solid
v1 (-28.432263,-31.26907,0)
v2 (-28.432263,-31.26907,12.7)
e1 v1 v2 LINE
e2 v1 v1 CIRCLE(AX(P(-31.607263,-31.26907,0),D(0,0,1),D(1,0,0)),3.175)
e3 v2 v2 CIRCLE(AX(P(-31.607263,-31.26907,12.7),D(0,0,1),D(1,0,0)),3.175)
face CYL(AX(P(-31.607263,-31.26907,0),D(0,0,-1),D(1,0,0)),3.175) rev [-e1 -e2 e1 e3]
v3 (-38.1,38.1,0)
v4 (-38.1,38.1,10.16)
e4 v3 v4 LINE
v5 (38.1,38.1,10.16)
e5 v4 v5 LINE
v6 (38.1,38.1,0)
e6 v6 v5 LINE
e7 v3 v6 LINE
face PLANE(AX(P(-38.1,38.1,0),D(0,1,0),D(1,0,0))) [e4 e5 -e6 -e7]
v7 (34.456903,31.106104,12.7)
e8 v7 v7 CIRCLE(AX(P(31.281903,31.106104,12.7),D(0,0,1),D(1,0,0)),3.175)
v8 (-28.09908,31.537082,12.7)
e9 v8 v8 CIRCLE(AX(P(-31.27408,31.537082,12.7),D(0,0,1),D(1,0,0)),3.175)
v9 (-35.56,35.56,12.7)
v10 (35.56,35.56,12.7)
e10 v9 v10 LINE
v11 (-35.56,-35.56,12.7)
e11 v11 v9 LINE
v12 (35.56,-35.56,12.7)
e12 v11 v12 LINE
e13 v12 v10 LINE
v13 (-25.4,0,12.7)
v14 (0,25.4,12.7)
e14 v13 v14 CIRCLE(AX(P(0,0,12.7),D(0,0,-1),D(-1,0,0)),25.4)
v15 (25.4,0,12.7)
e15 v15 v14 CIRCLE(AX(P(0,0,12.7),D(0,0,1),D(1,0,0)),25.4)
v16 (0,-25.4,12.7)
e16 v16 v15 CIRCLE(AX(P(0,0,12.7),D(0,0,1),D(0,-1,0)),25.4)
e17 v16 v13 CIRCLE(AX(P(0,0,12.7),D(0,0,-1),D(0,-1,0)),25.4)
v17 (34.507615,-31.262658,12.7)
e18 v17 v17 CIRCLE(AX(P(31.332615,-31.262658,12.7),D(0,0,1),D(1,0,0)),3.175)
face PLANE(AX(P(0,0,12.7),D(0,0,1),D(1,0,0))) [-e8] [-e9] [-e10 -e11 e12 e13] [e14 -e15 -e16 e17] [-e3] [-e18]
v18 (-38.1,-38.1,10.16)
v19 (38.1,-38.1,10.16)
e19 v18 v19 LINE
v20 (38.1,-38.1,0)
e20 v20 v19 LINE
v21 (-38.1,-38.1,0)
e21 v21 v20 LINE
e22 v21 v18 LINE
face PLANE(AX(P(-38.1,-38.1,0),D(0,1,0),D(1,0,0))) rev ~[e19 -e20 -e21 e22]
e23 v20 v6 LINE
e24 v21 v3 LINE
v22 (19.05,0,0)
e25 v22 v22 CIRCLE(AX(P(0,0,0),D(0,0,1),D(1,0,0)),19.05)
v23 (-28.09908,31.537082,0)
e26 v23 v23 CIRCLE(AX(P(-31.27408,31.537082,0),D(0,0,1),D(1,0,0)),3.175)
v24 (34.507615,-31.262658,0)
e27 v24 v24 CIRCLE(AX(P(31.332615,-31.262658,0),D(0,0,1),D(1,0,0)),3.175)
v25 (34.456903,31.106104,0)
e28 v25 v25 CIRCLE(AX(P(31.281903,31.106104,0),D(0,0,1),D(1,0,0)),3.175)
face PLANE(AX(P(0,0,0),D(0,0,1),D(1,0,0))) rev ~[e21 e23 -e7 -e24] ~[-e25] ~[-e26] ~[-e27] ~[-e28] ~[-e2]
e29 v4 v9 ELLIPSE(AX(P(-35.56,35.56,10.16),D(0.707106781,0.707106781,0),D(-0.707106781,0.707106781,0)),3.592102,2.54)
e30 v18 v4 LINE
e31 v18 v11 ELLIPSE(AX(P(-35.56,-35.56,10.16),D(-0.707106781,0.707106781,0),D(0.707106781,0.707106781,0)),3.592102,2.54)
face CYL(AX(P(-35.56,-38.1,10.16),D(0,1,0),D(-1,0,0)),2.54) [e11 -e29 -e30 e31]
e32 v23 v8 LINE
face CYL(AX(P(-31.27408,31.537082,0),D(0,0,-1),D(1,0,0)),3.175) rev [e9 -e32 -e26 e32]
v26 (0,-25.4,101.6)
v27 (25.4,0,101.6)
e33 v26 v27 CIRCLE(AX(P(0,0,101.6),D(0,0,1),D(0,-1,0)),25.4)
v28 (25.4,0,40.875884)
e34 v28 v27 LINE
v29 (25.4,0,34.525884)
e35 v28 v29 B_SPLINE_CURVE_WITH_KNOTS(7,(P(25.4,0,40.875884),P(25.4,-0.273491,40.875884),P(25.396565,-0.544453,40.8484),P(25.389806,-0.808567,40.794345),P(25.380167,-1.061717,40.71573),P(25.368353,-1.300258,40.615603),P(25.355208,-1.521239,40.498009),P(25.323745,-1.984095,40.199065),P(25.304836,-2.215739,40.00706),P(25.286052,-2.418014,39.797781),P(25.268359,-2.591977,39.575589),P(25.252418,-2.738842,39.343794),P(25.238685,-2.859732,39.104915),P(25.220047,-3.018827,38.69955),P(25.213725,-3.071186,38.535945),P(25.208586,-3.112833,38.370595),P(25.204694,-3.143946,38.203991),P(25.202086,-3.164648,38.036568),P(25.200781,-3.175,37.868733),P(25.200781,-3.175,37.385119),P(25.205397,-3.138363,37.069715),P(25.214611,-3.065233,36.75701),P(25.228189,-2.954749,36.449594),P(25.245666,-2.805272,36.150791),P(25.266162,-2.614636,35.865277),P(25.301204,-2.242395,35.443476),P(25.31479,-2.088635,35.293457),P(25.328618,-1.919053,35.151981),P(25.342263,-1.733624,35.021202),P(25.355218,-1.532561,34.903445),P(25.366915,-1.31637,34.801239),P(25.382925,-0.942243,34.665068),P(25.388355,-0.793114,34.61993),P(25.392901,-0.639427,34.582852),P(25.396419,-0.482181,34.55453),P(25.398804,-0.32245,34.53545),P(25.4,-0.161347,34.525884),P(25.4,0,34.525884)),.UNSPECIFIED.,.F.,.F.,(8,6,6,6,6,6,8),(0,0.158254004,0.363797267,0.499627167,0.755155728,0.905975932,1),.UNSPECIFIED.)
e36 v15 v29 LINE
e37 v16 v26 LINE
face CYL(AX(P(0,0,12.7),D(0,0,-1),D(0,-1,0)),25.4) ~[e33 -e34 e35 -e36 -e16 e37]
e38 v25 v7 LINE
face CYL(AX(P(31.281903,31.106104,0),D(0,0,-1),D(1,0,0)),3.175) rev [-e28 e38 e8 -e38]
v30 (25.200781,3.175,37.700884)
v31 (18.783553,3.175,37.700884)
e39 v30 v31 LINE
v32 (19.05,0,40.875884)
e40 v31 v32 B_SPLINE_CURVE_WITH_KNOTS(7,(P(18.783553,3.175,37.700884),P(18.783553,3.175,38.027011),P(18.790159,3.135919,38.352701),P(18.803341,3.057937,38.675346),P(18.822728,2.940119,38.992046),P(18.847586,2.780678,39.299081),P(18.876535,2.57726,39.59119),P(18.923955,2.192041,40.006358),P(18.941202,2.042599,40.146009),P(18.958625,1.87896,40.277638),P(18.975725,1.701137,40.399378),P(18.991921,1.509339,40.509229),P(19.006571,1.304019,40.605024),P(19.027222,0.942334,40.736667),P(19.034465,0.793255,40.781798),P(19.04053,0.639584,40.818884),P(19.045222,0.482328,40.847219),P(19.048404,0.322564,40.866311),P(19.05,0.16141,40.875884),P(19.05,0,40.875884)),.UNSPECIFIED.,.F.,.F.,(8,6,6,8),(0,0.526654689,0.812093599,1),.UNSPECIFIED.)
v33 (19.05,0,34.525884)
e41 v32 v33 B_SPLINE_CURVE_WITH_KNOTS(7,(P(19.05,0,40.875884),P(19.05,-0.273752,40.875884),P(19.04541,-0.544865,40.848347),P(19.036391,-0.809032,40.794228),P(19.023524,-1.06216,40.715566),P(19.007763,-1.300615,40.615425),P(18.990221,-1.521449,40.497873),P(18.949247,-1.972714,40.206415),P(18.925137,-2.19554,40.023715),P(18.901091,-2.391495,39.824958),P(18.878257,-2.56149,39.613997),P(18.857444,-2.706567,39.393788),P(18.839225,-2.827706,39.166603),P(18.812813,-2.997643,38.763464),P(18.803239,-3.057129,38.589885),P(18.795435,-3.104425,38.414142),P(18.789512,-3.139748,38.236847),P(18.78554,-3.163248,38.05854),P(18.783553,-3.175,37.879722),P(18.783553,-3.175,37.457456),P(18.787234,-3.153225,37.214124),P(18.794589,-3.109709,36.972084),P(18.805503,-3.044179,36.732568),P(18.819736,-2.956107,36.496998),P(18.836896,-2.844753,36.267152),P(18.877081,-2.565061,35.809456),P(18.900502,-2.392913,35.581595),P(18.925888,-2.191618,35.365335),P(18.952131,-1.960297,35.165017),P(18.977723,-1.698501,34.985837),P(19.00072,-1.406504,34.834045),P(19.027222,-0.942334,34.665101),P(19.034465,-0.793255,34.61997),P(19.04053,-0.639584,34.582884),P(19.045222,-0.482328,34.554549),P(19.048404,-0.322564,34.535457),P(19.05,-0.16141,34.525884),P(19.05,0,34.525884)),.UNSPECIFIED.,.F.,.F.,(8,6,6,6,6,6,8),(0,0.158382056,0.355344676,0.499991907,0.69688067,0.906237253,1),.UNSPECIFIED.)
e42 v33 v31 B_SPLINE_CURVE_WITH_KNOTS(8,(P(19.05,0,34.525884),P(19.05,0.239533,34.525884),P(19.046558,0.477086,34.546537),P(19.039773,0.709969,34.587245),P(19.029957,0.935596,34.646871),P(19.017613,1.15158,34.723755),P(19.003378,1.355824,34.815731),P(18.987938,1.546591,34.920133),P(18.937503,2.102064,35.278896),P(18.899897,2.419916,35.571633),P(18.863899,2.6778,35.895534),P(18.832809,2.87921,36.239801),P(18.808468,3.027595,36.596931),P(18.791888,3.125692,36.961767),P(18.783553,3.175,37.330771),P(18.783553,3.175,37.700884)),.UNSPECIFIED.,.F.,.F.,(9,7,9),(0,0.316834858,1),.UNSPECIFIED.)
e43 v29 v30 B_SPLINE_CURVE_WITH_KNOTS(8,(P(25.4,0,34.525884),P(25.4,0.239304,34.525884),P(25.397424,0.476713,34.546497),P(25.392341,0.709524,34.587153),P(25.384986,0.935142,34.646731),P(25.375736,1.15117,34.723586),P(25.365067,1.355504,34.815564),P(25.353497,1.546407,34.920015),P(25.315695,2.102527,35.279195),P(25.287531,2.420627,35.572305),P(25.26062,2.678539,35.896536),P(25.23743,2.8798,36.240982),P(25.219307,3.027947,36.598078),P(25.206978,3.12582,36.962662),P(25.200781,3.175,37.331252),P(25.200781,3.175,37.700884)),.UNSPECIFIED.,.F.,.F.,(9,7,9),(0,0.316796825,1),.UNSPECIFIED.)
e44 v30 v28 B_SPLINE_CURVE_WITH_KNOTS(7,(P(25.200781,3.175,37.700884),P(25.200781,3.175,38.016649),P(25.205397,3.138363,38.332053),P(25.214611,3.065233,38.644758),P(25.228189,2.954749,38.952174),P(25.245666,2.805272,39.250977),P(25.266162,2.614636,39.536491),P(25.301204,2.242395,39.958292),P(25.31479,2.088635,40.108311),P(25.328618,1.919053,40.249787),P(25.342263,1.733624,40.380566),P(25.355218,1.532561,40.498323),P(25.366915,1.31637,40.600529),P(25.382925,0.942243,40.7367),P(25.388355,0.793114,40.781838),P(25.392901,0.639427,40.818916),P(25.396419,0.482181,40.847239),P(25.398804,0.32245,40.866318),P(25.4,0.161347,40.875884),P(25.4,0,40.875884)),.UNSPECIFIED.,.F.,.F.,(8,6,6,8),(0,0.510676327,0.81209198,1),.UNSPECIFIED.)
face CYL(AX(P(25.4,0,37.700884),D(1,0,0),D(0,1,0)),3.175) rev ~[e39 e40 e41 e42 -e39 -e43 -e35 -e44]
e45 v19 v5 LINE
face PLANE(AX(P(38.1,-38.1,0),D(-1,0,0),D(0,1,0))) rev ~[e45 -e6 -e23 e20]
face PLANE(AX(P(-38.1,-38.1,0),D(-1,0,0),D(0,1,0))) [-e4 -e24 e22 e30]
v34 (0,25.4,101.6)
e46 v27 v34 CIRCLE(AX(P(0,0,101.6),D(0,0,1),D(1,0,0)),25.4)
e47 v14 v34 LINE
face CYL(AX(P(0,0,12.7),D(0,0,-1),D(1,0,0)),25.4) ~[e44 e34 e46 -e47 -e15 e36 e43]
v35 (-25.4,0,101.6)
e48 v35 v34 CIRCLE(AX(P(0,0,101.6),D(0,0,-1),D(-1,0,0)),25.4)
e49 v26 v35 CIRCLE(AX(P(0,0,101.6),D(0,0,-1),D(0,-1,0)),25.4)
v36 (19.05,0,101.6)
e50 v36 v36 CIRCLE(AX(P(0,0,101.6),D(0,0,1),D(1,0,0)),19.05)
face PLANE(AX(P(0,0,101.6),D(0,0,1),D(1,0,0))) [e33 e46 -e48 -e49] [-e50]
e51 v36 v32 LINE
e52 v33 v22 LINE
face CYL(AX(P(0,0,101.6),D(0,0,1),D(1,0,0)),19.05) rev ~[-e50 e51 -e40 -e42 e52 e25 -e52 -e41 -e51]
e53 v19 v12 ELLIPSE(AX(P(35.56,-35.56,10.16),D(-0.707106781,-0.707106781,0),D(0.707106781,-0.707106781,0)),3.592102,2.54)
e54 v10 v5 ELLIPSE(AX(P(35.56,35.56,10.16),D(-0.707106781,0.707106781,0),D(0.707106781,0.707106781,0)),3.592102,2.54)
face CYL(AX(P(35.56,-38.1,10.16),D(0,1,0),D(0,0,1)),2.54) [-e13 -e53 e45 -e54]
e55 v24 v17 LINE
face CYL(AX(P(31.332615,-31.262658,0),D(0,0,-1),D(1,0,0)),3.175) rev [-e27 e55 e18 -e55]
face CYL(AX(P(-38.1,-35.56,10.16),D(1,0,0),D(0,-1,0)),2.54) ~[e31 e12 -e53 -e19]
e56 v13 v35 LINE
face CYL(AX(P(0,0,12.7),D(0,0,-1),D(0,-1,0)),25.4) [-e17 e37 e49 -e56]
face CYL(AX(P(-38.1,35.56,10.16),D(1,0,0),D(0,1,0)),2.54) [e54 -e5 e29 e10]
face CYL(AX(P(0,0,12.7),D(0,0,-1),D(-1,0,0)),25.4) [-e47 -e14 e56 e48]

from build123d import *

# Parameters (mm, degrees)
F0_W        = 50.8
F0_H        = 50.8
F1_DEPTH    = 101.6
F0_W_2      = 76.2
F0_H_2      = 76.2
F0_R        = 3.175
F2_DEPTH    = 12.7
F3_R        = 19.05
F4_DEPTH    = 101.601
F5_R        = 3.175
F6_DEPTH    = 25.4
F7_T1_DEPTH = 88.9
F8_R        = 2.54


# Not quite as in the source:
# - a fillet or chamfer that OpenCascade refuses, or shapes differently, is made with other operations: its cross-section is extruded or revolved along the edge and cut away or added


with BuildPart() as f1:
    # F0 (on Top) → F1 (new body)
    with BuildSketch(Plane.XY):
        Rectangle(F0_W, F0_H)
    extrude(amount=F1_DEPTH)

    # F0 (on Top) → F2 (join)
    with BuildSketch(Plane.XY):
        Rectangle(F0_W_2, F0_H_2)
        with Locations((-31.6072627902, -31.269069761)):
            Circle(F0_R, mode=Mode.SUBTRACT)
        with Locations((31.3326152668, -31.2626581123)):
            Circle(F0_R, mode=Mode.SUBTRACT)
        Rectangle(F0_W, F0_H, mode=Mode.SUBTRACT)
        with Locations((-31.2740796408, 31.5370819021)):
            Circle(F0_R, mode=Mode.SUBTRACT)
        with Locations((31.2819033467, 31.1061042501)):
            Circle(F0_R, mode=Mode.SUBTRACT)
    extrude(amount=F2_DEPTH)

    # F3 (on face) → F4 (cut, through all)
    with BuildSketch(Plane.XY.offset(101.6)):
        Circle(F3_R)
    extrude(amount=-F4_DEPTH, mode=Mode.SUBTRACT)

    # F5 (on face) → F6 (cut)
    with BuildSketch(Plane.YZ.offset(25.4)):
        with Locations((0, 37.7008840442)):
            Circle(F5_R)
    extrude(amount=-F6_DEPTH, mode=Mode.SUBTRACT)

    # F7: fillet of radius 25.4 on 4 edges, made by hand

    # F7_s2 → F7_t1 (cut)
    with BuildSketch(Plane.XY.offset(12.7)):
        with BuildLine():
            ThreePointArc((0, -25.4), (17.9605122421, -17.9605122421), (25.4, 0))
            Line((25.4, 0), (25.908, 0))
            Line((25.908, 0), (25.908, -25.908))
            Line((25.908, -25.908), (0, -25.908))
            Line((0, -25.908), (0, -25.4))
        make_face()
        with BuildLine():
            ThreePointArc((25.4, 0), (17.9605122421, 17.9605122421), (0, 25.4))
            Line((0, 25.4), (0, 25.908))
            Line((0, 25.908), (25.908, 25.908))
            Line((25.908, 25.908), (25.908, 0))
            Line((25.908, 0), (25.4, 0))
        make_face()
        with BuildLine():
            ThreePointArc((0, -25.4), (-17.9605122421, -17.9605122421), (-25.4, 0))
            Line((-25.4, 0), (-25.908, 0))
            Line((-25.908, 0), (-25.908, -25.908))
            Line((-25.908, -25.908), (0, -25.908))
            Line((0, -25.908), (0, -25.4))
        make_face()
        with BuildLine():
            ThreePointArc((-25.4, 0), (-17.9605122421, 17.9605122421), (0, 25.4))
            Line((0, 25.4), (0, 25.908))
            Line((0, 25.908), (-25.908, 25.908))
            Line((-25.908, 25.908), (-25.908, 0))
            Line((-25.908, 0), (-25.4, 0))
        make_face()
    extrude(amount=F7_T1_DEPTH, mode=Mode.SUBTRACT)

    # F8
    f8_edges = [f1.edges().sort_by_distance(p)[0] for p in [
        (0, -38.1, 12.7),
        (38.1, 0, 12.7),
        (-38.1, 0, 12.7),
        (0, 38.1, 12.7),
    ]]
    fillet(f8_edges, radius=F8_R)


solid = f1.part
